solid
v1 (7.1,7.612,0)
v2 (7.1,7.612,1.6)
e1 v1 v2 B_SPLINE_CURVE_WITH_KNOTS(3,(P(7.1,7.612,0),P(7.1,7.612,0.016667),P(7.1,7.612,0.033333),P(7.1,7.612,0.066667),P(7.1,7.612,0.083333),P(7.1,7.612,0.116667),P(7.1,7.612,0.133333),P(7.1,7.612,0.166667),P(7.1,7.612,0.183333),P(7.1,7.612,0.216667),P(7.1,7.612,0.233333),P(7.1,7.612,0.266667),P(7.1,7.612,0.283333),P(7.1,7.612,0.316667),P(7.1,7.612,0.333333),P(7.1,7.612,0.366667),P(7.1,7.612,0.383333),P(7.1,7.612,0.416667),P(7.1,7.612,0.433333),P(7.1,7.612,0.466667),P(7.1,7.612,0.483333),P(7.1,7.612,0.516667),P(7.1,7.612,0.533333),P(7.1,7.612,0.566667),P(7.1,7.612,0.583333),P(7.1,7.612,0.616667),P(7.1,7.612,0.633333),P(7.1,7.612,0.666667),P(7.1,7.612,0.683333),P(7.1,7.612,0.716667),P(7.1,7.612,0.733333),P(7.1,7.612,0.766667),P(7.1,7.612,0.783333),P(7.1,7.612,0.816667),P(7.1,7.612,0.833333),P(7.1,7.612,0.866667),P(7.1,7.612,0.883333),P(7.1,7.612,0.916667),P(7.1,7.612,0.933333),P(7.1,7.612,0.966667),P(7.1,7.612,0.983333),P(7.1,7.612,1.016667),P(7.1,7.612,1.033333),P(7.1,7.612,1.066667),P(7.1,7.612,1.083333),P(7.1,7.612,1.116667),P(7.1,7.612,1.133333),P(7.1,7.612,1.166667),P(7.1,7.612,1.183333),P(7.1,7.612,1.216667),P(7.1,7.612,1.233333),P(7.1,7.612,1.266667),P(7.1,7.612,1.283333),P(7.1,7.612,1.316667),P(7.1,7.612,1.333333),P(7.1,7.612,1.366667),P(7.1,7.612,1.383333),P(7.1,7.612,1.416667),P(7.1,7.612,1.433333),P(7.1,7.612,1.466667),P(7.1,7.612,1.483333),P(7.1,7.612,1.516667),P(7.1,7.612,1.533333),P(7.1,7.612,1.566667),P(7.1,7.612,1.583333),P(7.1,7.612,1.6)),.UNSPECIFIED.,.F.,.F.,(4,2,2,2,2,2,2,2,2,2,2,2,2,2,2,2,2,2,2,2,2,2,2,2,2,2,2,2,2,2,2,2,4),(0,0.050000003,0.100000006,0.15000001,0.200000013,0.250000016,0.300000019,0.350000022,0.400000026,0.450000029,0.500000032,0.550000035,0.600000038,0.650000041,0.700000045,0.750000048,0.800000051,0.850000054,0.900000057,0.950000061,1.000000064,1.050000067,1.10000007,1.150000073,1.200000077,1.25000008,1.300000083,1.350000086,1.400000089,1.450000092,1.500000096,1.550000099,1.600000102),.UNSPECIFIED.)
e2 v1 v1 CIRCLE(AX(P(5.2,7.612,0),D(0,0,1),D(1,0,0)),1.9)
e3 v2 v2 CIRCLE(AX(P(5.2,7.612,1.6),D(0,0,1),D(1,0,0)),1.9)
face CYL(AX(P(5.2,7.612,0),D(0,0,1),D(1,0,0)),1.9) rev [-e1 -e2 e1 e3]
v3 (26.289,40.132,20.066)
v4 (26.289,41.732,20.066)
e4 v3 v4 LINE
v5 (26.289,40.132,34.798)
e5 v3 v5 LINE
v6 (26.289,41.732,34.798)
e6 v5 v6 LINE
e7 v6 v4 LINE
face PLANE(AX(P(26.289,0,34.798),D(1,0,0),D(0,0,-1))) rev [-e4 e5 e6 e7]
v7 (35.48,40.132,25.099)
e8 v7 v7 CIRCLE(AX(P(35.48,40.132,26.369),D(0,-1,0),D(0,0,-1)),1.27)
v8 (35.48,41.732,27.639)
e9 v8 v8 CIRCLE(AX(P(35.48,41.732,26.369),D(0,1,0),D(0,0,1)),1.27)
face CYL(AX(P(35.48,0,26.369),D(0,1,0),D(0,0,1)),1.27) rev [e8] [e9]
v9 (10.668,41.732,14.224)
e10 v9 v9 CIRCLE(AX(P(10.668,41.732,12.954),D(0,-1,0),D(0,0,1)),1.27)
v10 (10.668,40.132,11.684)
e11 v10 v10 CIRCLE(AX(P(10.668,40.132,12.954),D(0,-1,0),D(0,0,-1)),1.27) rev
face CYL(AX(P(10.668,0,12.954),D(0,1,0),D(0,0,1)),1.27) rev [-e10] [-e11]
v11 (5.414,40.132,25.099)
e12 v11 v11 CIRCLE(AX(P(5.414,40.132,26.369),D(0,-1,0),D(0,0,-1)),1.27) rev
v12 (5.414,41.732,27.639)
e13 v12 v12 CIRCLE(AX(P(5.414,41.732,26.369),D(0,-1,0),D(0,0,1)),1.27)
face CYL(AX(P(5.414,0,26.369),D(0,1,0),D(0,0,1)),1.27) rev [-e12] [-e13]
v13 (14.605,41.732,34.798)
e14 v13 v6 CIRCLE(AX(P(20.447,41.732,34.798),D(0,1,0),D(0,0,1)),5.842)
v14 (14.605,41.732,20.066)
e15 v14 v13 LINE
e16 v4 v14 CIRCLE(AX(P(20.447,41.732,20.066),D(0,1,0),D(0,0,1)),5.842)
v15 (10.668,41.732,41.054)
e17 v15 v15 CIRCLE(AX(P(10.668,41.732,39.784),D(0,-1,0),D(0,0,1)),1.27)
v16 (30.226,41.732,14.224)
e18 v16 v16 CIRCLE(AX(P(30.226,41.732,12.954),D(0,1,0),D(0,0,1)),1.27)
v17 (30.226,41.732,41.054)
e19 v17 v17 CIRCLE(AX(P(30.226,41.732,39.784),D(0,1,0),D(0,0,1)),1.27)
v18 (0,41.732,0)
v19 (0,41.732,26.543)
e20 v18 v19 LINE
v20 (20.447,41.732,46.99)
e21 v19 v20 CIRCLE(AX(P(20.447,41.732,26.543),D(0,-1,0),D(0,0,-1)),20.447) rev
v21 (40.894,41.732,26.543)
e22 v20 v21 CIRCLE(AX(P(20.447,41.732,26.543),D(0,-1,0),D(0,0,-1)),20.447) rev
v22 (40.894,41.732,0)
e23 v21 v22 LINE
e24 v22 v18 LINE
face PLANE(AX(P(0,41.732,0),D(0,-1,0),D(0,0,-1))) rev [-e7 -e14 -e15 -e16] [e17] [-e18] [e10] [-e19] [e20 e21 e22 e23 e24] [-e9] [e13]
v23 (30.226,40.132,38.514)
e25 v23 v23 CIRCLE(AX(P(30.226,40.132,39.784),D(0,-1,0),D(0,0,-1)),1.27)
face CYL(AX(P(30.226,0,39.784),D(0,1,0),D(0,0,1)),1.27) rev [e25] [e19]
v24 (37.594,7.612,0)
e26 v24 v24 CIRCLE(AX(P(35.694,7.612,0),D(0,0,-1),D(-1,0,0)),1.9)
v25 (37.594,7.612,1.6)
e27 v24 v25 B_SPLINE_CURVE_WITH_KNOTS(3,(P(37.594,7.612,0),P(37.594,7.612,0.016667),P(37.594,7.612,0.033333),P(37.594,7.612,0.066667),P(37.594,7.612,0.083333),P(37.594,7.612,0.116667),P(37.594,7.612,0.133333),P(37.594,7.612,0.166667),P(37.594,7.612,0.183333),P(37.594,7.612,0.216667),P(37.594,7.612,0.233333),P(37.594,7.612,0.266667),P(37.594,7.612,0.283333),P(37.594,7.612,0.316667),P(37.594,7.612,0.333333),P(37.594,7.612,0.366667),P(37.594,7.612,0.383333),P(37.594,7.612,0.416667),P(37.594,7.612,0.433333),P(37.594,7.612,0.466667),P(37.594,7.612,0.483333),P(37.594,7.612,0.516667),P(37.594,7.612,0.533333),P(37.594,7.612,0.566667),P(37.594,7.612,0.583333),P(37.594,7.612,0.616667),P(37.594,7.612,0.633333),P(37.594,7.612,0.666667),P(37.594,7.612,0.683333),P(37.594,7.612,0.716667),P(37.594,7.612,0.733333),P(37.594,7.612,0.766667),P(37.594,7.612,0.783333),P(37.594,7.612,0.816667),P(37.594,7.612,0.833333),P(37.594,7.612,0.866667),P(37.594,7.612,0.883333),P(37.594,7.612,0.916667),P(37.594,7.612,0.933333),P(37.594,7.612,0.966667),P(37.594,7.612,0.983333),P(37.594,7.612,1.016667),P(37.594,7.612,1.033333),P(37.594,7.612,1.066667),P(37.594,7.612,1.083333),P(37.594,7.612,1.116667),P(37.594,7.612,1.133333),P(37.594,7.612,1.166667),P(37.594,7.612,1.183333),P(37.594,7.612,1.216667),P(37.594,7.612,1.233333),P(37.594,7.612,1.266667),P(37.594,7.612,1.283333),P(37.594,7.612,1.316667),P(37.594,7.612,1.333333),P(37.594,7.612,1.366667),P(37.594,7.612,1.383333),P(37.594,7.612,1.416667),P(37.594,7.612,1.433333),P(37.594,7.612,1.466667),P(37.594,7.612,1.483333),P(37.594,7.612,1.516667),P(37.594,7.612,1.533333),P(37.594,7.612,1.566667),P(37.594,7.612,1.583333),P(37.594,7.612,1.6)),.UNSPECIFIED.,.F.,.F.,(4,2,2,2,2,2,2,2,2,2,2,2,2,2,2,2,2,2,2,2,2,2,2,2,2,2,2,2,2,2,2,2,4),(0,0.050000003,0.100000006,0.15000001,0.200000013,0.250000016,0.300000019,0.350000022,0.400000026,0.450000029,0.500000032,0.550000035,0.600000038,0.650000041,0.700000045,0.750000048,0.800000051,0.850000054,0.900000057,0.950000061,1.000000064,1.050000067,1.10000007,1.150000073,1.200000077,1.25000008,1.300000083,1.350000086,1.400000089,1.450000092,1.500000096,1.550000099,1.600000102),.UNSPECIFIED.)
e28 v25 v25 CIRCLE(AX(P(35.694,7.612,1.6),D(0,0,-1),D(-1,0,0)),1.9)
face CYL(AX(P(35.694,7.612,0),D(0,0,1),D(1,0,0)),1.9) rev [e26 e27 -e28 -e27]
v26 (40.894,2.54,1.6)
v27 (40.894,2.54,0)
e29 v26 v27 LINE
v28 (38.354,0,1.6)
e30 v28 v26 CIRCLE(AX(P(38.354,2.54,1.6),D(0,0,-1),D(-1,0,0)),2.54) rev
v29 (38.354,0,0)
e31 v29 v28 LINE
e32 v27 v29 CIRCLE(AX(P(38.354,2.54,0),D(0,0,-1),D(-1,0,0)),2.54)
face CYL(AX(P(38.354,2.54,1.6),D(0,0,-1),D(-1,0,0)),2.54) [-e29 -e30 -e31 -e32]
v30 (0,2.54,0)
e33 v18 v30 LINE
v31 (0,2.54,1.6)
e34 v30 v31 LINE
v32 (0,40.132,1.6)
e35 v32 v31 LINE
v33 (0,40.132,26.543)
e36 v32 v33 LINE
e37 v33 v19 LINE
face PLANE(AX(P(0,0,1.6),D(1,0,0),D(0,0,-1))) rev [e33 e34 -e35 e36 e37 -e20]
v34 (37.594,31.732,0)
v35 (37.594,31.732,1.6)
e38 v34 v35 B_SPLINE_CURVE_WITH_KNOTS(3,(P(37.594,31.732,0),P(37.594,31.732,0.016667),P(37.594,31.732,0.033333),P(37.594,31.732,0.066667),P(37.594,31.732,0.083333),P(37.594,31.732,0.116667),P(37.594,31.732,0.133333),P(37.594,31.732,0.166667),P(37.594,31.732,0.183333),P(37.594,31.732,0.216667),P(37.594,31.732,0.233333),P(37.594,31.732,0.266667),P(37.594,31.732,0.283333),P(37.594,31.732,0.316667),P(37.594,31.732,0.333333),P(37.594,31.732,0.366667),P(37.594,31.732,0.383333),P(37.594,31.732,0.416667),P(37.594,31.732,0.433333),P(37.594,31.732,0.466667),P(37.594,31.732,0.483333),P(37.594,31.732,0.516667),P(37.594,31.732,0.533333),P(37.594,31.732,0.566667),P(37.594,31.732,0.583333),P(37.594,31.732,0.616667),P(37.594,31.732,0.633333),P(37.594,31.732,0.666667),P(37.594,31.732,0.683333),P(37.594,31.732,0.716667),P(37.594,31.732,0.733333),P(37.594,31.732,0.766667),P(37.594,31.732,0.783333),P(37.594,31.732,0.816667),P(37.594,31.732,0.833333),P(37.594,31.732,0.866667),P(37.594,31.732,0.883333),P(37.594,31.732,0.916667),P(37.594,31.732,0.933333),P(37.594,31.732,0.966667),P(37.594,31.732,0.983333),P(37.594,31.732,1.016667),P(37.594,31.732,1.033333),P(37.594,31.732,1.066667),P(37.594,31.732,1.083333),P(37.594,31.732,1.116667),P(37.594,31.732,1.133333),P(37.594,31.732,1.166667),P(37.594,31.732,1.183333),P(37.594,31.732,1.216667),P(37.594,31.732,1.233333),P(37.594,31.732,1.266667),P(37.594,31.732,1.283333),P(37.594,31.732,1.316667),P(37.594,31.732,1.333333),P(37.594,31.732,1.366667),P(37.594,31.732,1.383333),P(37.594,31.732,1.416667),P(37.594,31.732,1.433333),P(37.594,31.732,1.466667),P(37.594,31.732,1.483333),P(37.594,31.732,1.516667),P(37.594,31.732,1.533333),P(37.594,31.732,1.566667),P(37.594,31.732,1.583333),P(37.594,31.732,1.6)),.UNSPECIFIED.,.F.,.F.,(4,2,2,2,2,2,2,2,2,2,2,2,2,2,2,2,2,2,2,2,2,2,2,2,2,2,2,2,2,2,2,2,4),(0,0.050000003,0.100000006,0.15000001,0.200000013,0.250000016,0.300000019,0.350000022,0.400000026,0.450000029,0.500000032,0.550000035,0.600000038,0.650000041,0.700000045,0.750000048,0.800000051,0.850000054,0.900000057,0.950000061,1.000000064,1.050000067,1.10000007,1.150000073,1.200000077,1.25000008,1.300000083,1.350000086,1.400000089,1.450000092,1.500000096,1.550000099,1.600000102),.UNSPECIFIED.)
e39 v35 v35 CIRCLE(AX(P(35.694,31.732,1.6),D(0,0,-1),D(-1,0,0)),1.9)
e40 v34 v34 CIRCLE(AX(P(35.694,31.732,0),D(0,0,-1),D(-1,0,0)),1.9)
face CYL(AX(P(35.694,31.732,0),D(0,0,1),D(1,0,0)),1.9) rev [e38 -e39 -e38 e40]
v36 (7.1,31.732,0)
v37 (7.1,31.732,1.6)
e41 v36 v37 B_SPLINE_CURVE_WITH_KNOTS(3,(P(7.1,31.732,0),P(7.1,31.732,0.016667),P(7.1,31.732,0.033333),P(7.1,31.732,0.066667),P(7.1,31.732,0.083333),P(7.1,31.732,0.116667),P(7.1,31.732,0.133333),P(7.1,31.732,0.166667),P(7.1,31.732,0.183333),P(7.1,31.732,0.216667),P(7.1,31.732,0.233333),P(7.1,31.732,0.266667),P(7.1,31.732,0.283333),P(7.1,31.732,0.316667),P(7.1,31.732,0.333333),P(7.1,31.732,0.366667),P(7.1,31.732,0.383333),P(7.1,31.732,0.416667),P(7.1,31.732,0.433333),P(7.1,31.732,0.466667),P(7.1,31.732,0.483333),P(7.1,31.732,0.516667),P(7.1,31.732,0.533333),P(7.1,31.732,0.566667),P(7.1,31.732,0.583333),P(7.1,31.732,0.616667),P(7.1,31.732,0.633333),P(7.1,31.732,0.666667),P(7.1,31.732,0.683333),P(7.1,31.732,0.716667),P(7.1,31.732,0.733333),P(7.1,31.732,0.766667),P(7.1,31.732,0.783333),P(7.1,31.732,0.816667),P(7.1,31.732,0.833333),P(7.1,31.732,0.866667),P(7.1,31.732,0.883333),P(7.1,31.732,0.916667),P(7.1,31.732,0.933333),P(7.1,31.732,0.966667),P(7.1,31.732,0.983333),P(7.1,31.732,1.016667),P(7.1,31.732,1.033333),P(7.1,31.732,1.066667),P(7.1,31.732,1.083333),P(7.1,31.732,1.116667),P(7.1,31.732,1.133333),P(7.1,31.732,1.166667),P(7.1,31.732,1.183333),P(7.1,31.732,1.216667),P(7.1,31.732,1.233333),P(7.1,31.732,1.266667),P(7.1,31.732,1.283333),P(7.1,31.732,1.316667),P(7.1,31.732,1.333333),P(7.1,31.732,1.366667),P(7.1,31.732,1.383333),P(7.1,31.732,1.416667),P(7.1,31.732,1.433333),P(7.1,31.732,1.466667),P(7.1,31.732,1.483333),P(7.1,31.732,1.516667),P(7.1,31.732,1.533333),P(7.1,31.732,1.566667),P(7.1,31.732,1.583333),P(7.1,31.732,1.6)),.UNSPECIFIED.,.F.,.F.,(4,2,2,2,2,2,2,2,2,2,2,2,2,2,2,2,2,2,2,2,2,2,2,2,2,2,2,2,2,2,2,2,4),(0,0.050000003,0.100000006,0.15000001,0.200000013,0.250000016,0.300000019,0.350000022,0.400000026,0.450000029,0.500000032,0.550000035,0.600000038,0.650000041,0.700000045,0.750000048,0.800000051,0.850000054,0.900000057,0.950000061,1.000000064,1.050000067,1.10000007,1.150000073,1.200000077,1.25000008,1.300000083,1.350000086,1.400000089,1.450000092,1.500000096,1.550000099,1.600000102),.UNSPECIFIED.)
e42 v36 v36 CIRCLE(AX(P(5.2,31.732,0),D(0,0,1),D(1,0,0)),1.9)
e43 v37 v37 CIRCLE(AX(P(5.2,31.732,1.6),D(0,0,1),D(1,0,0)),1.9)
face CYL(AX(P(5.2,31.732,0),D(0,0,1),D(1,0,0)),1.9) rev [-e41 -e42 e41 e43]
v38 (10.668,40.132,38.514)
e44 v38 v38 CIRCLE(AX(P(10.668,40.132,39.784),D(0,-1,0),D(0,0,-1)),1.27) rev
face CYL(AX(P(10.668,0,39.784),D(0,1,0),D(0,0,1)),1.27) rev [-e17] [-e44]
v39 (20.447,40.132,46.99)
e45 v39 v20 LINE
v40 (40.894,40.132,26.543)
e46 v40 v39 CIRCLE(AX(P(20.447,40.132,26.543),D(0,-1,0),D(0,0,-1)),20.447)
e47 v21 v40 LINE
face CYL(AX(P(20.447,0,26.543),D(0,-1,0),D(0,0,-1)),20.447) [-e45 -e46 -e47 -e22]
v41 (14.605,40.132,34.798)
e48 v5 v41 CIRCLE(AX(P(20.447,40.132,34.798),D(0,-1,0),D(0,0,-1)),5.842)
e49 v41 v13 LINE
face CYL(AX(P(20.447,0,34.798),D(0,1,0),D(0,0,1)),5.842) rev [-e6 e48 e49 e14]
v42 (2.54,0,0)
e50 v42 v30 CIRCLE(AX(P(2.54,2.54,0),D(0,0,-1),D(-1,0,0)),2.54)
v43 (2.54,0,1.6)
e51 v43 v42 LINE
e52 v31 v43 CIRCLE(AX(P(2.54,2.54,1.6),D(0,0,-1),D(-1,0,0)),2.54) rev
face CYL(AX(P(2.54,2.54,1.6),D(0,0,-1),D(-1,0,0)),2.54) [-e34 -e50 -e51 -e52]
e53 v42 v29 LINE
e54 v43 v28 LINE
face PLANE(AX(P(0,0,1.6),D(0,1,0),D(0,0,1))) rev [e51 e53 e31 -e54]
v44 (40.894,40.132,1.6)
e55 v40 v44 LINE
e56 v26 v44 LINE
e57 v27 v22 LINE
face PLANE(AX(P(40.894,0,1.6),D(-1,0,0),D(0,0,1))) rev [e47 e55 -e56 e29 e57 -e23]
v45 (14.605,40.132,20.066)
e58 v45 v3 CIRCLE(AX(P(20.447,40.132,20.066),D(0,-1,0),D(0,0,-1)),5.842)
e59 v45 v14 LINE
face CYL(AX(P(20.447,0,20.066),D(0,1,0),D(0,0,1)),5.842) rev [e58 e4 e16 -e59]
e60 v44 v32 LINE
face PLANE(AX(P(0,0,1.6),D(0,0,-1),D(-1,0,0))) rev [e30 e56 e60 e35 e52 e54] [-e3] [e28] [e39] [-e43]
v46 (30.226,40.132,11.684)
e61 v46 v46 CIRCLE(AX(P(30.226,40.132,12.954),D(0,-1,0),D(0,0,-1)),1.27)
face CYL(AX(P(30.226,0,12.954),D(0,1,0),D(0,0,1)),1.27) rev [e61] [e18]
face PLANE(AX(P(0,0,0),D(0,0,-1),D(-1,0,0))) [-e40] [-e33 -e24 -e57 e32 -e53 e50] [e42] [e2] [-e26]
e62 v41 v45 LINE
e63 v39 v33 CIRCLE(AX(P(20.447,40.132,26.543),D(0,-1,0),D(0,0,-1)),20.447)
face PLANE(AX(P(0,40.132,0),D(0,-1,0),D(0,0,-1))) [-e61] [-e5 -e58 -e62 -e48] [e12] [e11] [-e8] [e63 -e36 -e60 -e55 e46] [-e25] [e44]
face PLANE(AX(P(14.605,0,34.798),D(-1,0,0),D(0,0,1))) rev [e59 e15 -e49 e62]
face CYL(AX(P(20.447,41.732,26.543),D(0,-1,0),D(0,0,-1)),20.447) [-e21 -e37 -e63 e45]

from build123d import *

# Parameters (mm, degrees)
SKETCH1_W           = 40.894
SKETCH1_H           = 40.132
BOSS_EXTRUDE1_DEPTH = 1.600000102
SKETCH2_R           = 1.90000001
CUT_EXTRUDE1_DEPTH  = 58.318903168
SKETCH2_3_R         = 1.90000001
CUT_EXTRUDE2_DEPTH  = 58.318903168
FILLET1_R           = 2.54
SKETCH5_W           = 40.894
SKETCH5_H           = 46.99
BOSS_EXTRUDE2_DEPTH = 1.600000102
FILLET2_R           = 20.447
SKETCH6_R           = 1.27
CUT_EXTRUDE3_DEPTH  = 75.97959168
CUT_EXTRUDE4_DEPTH  = 75.97959168


with BuildPart() as part:
    # Sketch1 → Boss-Extrude1 (new body)
    with BuildSketch(Plane.XY):
        with Locations((20.447, 20.066)):
            Rectangle(SKETCH1_W, SKETCH1_H)
    extrude(amount=BOSS_EXTRUDE1_DEPTH)

    # Sketch2 → Cut-Extrude1 (cut, through all)
    with BuildSketch(Plane.XY.offset(1.600000102)):
        with Locations((5.200000014, 7.612000016)):
            Circle(SKETCH2_R)
    cut_extrude1 = extrude(amount=-CUT_EXTRUDE1_DEPTH, mode=Mode.SUBTRACT)

    # Sketch2<3> → Cut-Extrude2 (cut, through all)
    with BuildSketch(Plane.XY.offset(1.600000102)):
        with Locations((5.200000014, 31.732000036)):
            Circle(SKETCH2_3_R)
        with Locations((5.200000014, 7.612000016)):
            Circle(SKETCH2_3_R)
    cut_extrude2 = extrude(amount=-CUT_EXTRUDE2_DEPTH, mode=Mode.SUBTRACT)

    # Mirror2: Cut-Extrude1, Cut-Extrude2 across plane
    add(cut_extrude1.mirror(Plane.ZY.offset(-20.447)), mode=Mode.SUBTRACT)
    add(cut_extrude2.mirror(Plane.ZY.offset(-20.447)), mode=Mode.SUBTRACT)

    # Fillet1
    fillet1_edges = [part.edges().sort_by_distance(p)[0] for p in [
        (40.894, 0, 0.800000051),
        (0, 0, 0.800000051),
    ]]
    fillet(fillet1_edges, radius=FILLET1_R)

    # Sketch5 → Boss-Extrude2 (add)
    with BuildSketch(Plane(origin=(0, 40.132, 0), x_dir=(1, 0, 0), z_dir=(0, 1, 0))):
        with Locations((20.447, -23.495)):
            Rectangle(SKETCH5_W, SKETCH5_H)
    extrude(amount=BOSS_EXTRUDE2_DEPTH)

    # Fillet2
    fillet2_edges = [part.edges().sort_by_distance(p)[0] for p in [
        (0, 40.932000051, 46.99),
        (40.894, 40.932000051, 46.99),
    ]]
    fillet(fillet2_edges, radius=FILLET2_R - 0.0001)  # a hair under: the kernel refuses the full size

    # Sketch6 → Cut-Extrude3 (cut, through all)
    with BuildSketch(Plane(origin=(0, 41.732000102, 0), x_dir=(1, 0, 0), z_dir=(0, 1, 0))):
        with Locations(Location((30.226, -39.783999934, 0), (0, 0, 270))):
            Circle(SKETCH6_R)
        with Locations(Location((30.226, -12.954, 0), (0, 0, 270))):
            Circle(SKETCH6_R)
        with Locations(Location((35.480000033, -26.368999967, 0), (0, 0, 270))):
            Circle(SKETCH6_R)
    cut_extrude3 = extrude(amount=-CUT_EXTRUDE3_DEPTH, mode=Mode.SUBTRACT)

    # Mirror3: Cut-Extrude3 across plane
    add(cut_extrude3.mirror(Plane.ZY.offset(-20.447)), mode=Mode.SUBTRACT)

    # Sketch7 → Cut-Extrude4 (cut, through all)
    with BuildSketch(Plane(origin=(0, 41.732000102, 0), x_dir=(1, 0, 0), z_dir=(0, 1, 0))):
        with BuildLine():
            Line((14.605, -34.798), (14.605, -20.066))
            ThreePointArc((14.605, -20.066), (20.447, -14.224), (26.289, -20.066))
            Line((26.289, -20.066), (26.289, -34.798))
            ThreePointArc((26.289, -34.798), (20.447, -40.64), (14.605, -34.798))
        make_face()
    extrude(amount=-CUT_EXTRUDE4_DEPTH, mode=Mode.SUBTRACT)


solid = part.part
